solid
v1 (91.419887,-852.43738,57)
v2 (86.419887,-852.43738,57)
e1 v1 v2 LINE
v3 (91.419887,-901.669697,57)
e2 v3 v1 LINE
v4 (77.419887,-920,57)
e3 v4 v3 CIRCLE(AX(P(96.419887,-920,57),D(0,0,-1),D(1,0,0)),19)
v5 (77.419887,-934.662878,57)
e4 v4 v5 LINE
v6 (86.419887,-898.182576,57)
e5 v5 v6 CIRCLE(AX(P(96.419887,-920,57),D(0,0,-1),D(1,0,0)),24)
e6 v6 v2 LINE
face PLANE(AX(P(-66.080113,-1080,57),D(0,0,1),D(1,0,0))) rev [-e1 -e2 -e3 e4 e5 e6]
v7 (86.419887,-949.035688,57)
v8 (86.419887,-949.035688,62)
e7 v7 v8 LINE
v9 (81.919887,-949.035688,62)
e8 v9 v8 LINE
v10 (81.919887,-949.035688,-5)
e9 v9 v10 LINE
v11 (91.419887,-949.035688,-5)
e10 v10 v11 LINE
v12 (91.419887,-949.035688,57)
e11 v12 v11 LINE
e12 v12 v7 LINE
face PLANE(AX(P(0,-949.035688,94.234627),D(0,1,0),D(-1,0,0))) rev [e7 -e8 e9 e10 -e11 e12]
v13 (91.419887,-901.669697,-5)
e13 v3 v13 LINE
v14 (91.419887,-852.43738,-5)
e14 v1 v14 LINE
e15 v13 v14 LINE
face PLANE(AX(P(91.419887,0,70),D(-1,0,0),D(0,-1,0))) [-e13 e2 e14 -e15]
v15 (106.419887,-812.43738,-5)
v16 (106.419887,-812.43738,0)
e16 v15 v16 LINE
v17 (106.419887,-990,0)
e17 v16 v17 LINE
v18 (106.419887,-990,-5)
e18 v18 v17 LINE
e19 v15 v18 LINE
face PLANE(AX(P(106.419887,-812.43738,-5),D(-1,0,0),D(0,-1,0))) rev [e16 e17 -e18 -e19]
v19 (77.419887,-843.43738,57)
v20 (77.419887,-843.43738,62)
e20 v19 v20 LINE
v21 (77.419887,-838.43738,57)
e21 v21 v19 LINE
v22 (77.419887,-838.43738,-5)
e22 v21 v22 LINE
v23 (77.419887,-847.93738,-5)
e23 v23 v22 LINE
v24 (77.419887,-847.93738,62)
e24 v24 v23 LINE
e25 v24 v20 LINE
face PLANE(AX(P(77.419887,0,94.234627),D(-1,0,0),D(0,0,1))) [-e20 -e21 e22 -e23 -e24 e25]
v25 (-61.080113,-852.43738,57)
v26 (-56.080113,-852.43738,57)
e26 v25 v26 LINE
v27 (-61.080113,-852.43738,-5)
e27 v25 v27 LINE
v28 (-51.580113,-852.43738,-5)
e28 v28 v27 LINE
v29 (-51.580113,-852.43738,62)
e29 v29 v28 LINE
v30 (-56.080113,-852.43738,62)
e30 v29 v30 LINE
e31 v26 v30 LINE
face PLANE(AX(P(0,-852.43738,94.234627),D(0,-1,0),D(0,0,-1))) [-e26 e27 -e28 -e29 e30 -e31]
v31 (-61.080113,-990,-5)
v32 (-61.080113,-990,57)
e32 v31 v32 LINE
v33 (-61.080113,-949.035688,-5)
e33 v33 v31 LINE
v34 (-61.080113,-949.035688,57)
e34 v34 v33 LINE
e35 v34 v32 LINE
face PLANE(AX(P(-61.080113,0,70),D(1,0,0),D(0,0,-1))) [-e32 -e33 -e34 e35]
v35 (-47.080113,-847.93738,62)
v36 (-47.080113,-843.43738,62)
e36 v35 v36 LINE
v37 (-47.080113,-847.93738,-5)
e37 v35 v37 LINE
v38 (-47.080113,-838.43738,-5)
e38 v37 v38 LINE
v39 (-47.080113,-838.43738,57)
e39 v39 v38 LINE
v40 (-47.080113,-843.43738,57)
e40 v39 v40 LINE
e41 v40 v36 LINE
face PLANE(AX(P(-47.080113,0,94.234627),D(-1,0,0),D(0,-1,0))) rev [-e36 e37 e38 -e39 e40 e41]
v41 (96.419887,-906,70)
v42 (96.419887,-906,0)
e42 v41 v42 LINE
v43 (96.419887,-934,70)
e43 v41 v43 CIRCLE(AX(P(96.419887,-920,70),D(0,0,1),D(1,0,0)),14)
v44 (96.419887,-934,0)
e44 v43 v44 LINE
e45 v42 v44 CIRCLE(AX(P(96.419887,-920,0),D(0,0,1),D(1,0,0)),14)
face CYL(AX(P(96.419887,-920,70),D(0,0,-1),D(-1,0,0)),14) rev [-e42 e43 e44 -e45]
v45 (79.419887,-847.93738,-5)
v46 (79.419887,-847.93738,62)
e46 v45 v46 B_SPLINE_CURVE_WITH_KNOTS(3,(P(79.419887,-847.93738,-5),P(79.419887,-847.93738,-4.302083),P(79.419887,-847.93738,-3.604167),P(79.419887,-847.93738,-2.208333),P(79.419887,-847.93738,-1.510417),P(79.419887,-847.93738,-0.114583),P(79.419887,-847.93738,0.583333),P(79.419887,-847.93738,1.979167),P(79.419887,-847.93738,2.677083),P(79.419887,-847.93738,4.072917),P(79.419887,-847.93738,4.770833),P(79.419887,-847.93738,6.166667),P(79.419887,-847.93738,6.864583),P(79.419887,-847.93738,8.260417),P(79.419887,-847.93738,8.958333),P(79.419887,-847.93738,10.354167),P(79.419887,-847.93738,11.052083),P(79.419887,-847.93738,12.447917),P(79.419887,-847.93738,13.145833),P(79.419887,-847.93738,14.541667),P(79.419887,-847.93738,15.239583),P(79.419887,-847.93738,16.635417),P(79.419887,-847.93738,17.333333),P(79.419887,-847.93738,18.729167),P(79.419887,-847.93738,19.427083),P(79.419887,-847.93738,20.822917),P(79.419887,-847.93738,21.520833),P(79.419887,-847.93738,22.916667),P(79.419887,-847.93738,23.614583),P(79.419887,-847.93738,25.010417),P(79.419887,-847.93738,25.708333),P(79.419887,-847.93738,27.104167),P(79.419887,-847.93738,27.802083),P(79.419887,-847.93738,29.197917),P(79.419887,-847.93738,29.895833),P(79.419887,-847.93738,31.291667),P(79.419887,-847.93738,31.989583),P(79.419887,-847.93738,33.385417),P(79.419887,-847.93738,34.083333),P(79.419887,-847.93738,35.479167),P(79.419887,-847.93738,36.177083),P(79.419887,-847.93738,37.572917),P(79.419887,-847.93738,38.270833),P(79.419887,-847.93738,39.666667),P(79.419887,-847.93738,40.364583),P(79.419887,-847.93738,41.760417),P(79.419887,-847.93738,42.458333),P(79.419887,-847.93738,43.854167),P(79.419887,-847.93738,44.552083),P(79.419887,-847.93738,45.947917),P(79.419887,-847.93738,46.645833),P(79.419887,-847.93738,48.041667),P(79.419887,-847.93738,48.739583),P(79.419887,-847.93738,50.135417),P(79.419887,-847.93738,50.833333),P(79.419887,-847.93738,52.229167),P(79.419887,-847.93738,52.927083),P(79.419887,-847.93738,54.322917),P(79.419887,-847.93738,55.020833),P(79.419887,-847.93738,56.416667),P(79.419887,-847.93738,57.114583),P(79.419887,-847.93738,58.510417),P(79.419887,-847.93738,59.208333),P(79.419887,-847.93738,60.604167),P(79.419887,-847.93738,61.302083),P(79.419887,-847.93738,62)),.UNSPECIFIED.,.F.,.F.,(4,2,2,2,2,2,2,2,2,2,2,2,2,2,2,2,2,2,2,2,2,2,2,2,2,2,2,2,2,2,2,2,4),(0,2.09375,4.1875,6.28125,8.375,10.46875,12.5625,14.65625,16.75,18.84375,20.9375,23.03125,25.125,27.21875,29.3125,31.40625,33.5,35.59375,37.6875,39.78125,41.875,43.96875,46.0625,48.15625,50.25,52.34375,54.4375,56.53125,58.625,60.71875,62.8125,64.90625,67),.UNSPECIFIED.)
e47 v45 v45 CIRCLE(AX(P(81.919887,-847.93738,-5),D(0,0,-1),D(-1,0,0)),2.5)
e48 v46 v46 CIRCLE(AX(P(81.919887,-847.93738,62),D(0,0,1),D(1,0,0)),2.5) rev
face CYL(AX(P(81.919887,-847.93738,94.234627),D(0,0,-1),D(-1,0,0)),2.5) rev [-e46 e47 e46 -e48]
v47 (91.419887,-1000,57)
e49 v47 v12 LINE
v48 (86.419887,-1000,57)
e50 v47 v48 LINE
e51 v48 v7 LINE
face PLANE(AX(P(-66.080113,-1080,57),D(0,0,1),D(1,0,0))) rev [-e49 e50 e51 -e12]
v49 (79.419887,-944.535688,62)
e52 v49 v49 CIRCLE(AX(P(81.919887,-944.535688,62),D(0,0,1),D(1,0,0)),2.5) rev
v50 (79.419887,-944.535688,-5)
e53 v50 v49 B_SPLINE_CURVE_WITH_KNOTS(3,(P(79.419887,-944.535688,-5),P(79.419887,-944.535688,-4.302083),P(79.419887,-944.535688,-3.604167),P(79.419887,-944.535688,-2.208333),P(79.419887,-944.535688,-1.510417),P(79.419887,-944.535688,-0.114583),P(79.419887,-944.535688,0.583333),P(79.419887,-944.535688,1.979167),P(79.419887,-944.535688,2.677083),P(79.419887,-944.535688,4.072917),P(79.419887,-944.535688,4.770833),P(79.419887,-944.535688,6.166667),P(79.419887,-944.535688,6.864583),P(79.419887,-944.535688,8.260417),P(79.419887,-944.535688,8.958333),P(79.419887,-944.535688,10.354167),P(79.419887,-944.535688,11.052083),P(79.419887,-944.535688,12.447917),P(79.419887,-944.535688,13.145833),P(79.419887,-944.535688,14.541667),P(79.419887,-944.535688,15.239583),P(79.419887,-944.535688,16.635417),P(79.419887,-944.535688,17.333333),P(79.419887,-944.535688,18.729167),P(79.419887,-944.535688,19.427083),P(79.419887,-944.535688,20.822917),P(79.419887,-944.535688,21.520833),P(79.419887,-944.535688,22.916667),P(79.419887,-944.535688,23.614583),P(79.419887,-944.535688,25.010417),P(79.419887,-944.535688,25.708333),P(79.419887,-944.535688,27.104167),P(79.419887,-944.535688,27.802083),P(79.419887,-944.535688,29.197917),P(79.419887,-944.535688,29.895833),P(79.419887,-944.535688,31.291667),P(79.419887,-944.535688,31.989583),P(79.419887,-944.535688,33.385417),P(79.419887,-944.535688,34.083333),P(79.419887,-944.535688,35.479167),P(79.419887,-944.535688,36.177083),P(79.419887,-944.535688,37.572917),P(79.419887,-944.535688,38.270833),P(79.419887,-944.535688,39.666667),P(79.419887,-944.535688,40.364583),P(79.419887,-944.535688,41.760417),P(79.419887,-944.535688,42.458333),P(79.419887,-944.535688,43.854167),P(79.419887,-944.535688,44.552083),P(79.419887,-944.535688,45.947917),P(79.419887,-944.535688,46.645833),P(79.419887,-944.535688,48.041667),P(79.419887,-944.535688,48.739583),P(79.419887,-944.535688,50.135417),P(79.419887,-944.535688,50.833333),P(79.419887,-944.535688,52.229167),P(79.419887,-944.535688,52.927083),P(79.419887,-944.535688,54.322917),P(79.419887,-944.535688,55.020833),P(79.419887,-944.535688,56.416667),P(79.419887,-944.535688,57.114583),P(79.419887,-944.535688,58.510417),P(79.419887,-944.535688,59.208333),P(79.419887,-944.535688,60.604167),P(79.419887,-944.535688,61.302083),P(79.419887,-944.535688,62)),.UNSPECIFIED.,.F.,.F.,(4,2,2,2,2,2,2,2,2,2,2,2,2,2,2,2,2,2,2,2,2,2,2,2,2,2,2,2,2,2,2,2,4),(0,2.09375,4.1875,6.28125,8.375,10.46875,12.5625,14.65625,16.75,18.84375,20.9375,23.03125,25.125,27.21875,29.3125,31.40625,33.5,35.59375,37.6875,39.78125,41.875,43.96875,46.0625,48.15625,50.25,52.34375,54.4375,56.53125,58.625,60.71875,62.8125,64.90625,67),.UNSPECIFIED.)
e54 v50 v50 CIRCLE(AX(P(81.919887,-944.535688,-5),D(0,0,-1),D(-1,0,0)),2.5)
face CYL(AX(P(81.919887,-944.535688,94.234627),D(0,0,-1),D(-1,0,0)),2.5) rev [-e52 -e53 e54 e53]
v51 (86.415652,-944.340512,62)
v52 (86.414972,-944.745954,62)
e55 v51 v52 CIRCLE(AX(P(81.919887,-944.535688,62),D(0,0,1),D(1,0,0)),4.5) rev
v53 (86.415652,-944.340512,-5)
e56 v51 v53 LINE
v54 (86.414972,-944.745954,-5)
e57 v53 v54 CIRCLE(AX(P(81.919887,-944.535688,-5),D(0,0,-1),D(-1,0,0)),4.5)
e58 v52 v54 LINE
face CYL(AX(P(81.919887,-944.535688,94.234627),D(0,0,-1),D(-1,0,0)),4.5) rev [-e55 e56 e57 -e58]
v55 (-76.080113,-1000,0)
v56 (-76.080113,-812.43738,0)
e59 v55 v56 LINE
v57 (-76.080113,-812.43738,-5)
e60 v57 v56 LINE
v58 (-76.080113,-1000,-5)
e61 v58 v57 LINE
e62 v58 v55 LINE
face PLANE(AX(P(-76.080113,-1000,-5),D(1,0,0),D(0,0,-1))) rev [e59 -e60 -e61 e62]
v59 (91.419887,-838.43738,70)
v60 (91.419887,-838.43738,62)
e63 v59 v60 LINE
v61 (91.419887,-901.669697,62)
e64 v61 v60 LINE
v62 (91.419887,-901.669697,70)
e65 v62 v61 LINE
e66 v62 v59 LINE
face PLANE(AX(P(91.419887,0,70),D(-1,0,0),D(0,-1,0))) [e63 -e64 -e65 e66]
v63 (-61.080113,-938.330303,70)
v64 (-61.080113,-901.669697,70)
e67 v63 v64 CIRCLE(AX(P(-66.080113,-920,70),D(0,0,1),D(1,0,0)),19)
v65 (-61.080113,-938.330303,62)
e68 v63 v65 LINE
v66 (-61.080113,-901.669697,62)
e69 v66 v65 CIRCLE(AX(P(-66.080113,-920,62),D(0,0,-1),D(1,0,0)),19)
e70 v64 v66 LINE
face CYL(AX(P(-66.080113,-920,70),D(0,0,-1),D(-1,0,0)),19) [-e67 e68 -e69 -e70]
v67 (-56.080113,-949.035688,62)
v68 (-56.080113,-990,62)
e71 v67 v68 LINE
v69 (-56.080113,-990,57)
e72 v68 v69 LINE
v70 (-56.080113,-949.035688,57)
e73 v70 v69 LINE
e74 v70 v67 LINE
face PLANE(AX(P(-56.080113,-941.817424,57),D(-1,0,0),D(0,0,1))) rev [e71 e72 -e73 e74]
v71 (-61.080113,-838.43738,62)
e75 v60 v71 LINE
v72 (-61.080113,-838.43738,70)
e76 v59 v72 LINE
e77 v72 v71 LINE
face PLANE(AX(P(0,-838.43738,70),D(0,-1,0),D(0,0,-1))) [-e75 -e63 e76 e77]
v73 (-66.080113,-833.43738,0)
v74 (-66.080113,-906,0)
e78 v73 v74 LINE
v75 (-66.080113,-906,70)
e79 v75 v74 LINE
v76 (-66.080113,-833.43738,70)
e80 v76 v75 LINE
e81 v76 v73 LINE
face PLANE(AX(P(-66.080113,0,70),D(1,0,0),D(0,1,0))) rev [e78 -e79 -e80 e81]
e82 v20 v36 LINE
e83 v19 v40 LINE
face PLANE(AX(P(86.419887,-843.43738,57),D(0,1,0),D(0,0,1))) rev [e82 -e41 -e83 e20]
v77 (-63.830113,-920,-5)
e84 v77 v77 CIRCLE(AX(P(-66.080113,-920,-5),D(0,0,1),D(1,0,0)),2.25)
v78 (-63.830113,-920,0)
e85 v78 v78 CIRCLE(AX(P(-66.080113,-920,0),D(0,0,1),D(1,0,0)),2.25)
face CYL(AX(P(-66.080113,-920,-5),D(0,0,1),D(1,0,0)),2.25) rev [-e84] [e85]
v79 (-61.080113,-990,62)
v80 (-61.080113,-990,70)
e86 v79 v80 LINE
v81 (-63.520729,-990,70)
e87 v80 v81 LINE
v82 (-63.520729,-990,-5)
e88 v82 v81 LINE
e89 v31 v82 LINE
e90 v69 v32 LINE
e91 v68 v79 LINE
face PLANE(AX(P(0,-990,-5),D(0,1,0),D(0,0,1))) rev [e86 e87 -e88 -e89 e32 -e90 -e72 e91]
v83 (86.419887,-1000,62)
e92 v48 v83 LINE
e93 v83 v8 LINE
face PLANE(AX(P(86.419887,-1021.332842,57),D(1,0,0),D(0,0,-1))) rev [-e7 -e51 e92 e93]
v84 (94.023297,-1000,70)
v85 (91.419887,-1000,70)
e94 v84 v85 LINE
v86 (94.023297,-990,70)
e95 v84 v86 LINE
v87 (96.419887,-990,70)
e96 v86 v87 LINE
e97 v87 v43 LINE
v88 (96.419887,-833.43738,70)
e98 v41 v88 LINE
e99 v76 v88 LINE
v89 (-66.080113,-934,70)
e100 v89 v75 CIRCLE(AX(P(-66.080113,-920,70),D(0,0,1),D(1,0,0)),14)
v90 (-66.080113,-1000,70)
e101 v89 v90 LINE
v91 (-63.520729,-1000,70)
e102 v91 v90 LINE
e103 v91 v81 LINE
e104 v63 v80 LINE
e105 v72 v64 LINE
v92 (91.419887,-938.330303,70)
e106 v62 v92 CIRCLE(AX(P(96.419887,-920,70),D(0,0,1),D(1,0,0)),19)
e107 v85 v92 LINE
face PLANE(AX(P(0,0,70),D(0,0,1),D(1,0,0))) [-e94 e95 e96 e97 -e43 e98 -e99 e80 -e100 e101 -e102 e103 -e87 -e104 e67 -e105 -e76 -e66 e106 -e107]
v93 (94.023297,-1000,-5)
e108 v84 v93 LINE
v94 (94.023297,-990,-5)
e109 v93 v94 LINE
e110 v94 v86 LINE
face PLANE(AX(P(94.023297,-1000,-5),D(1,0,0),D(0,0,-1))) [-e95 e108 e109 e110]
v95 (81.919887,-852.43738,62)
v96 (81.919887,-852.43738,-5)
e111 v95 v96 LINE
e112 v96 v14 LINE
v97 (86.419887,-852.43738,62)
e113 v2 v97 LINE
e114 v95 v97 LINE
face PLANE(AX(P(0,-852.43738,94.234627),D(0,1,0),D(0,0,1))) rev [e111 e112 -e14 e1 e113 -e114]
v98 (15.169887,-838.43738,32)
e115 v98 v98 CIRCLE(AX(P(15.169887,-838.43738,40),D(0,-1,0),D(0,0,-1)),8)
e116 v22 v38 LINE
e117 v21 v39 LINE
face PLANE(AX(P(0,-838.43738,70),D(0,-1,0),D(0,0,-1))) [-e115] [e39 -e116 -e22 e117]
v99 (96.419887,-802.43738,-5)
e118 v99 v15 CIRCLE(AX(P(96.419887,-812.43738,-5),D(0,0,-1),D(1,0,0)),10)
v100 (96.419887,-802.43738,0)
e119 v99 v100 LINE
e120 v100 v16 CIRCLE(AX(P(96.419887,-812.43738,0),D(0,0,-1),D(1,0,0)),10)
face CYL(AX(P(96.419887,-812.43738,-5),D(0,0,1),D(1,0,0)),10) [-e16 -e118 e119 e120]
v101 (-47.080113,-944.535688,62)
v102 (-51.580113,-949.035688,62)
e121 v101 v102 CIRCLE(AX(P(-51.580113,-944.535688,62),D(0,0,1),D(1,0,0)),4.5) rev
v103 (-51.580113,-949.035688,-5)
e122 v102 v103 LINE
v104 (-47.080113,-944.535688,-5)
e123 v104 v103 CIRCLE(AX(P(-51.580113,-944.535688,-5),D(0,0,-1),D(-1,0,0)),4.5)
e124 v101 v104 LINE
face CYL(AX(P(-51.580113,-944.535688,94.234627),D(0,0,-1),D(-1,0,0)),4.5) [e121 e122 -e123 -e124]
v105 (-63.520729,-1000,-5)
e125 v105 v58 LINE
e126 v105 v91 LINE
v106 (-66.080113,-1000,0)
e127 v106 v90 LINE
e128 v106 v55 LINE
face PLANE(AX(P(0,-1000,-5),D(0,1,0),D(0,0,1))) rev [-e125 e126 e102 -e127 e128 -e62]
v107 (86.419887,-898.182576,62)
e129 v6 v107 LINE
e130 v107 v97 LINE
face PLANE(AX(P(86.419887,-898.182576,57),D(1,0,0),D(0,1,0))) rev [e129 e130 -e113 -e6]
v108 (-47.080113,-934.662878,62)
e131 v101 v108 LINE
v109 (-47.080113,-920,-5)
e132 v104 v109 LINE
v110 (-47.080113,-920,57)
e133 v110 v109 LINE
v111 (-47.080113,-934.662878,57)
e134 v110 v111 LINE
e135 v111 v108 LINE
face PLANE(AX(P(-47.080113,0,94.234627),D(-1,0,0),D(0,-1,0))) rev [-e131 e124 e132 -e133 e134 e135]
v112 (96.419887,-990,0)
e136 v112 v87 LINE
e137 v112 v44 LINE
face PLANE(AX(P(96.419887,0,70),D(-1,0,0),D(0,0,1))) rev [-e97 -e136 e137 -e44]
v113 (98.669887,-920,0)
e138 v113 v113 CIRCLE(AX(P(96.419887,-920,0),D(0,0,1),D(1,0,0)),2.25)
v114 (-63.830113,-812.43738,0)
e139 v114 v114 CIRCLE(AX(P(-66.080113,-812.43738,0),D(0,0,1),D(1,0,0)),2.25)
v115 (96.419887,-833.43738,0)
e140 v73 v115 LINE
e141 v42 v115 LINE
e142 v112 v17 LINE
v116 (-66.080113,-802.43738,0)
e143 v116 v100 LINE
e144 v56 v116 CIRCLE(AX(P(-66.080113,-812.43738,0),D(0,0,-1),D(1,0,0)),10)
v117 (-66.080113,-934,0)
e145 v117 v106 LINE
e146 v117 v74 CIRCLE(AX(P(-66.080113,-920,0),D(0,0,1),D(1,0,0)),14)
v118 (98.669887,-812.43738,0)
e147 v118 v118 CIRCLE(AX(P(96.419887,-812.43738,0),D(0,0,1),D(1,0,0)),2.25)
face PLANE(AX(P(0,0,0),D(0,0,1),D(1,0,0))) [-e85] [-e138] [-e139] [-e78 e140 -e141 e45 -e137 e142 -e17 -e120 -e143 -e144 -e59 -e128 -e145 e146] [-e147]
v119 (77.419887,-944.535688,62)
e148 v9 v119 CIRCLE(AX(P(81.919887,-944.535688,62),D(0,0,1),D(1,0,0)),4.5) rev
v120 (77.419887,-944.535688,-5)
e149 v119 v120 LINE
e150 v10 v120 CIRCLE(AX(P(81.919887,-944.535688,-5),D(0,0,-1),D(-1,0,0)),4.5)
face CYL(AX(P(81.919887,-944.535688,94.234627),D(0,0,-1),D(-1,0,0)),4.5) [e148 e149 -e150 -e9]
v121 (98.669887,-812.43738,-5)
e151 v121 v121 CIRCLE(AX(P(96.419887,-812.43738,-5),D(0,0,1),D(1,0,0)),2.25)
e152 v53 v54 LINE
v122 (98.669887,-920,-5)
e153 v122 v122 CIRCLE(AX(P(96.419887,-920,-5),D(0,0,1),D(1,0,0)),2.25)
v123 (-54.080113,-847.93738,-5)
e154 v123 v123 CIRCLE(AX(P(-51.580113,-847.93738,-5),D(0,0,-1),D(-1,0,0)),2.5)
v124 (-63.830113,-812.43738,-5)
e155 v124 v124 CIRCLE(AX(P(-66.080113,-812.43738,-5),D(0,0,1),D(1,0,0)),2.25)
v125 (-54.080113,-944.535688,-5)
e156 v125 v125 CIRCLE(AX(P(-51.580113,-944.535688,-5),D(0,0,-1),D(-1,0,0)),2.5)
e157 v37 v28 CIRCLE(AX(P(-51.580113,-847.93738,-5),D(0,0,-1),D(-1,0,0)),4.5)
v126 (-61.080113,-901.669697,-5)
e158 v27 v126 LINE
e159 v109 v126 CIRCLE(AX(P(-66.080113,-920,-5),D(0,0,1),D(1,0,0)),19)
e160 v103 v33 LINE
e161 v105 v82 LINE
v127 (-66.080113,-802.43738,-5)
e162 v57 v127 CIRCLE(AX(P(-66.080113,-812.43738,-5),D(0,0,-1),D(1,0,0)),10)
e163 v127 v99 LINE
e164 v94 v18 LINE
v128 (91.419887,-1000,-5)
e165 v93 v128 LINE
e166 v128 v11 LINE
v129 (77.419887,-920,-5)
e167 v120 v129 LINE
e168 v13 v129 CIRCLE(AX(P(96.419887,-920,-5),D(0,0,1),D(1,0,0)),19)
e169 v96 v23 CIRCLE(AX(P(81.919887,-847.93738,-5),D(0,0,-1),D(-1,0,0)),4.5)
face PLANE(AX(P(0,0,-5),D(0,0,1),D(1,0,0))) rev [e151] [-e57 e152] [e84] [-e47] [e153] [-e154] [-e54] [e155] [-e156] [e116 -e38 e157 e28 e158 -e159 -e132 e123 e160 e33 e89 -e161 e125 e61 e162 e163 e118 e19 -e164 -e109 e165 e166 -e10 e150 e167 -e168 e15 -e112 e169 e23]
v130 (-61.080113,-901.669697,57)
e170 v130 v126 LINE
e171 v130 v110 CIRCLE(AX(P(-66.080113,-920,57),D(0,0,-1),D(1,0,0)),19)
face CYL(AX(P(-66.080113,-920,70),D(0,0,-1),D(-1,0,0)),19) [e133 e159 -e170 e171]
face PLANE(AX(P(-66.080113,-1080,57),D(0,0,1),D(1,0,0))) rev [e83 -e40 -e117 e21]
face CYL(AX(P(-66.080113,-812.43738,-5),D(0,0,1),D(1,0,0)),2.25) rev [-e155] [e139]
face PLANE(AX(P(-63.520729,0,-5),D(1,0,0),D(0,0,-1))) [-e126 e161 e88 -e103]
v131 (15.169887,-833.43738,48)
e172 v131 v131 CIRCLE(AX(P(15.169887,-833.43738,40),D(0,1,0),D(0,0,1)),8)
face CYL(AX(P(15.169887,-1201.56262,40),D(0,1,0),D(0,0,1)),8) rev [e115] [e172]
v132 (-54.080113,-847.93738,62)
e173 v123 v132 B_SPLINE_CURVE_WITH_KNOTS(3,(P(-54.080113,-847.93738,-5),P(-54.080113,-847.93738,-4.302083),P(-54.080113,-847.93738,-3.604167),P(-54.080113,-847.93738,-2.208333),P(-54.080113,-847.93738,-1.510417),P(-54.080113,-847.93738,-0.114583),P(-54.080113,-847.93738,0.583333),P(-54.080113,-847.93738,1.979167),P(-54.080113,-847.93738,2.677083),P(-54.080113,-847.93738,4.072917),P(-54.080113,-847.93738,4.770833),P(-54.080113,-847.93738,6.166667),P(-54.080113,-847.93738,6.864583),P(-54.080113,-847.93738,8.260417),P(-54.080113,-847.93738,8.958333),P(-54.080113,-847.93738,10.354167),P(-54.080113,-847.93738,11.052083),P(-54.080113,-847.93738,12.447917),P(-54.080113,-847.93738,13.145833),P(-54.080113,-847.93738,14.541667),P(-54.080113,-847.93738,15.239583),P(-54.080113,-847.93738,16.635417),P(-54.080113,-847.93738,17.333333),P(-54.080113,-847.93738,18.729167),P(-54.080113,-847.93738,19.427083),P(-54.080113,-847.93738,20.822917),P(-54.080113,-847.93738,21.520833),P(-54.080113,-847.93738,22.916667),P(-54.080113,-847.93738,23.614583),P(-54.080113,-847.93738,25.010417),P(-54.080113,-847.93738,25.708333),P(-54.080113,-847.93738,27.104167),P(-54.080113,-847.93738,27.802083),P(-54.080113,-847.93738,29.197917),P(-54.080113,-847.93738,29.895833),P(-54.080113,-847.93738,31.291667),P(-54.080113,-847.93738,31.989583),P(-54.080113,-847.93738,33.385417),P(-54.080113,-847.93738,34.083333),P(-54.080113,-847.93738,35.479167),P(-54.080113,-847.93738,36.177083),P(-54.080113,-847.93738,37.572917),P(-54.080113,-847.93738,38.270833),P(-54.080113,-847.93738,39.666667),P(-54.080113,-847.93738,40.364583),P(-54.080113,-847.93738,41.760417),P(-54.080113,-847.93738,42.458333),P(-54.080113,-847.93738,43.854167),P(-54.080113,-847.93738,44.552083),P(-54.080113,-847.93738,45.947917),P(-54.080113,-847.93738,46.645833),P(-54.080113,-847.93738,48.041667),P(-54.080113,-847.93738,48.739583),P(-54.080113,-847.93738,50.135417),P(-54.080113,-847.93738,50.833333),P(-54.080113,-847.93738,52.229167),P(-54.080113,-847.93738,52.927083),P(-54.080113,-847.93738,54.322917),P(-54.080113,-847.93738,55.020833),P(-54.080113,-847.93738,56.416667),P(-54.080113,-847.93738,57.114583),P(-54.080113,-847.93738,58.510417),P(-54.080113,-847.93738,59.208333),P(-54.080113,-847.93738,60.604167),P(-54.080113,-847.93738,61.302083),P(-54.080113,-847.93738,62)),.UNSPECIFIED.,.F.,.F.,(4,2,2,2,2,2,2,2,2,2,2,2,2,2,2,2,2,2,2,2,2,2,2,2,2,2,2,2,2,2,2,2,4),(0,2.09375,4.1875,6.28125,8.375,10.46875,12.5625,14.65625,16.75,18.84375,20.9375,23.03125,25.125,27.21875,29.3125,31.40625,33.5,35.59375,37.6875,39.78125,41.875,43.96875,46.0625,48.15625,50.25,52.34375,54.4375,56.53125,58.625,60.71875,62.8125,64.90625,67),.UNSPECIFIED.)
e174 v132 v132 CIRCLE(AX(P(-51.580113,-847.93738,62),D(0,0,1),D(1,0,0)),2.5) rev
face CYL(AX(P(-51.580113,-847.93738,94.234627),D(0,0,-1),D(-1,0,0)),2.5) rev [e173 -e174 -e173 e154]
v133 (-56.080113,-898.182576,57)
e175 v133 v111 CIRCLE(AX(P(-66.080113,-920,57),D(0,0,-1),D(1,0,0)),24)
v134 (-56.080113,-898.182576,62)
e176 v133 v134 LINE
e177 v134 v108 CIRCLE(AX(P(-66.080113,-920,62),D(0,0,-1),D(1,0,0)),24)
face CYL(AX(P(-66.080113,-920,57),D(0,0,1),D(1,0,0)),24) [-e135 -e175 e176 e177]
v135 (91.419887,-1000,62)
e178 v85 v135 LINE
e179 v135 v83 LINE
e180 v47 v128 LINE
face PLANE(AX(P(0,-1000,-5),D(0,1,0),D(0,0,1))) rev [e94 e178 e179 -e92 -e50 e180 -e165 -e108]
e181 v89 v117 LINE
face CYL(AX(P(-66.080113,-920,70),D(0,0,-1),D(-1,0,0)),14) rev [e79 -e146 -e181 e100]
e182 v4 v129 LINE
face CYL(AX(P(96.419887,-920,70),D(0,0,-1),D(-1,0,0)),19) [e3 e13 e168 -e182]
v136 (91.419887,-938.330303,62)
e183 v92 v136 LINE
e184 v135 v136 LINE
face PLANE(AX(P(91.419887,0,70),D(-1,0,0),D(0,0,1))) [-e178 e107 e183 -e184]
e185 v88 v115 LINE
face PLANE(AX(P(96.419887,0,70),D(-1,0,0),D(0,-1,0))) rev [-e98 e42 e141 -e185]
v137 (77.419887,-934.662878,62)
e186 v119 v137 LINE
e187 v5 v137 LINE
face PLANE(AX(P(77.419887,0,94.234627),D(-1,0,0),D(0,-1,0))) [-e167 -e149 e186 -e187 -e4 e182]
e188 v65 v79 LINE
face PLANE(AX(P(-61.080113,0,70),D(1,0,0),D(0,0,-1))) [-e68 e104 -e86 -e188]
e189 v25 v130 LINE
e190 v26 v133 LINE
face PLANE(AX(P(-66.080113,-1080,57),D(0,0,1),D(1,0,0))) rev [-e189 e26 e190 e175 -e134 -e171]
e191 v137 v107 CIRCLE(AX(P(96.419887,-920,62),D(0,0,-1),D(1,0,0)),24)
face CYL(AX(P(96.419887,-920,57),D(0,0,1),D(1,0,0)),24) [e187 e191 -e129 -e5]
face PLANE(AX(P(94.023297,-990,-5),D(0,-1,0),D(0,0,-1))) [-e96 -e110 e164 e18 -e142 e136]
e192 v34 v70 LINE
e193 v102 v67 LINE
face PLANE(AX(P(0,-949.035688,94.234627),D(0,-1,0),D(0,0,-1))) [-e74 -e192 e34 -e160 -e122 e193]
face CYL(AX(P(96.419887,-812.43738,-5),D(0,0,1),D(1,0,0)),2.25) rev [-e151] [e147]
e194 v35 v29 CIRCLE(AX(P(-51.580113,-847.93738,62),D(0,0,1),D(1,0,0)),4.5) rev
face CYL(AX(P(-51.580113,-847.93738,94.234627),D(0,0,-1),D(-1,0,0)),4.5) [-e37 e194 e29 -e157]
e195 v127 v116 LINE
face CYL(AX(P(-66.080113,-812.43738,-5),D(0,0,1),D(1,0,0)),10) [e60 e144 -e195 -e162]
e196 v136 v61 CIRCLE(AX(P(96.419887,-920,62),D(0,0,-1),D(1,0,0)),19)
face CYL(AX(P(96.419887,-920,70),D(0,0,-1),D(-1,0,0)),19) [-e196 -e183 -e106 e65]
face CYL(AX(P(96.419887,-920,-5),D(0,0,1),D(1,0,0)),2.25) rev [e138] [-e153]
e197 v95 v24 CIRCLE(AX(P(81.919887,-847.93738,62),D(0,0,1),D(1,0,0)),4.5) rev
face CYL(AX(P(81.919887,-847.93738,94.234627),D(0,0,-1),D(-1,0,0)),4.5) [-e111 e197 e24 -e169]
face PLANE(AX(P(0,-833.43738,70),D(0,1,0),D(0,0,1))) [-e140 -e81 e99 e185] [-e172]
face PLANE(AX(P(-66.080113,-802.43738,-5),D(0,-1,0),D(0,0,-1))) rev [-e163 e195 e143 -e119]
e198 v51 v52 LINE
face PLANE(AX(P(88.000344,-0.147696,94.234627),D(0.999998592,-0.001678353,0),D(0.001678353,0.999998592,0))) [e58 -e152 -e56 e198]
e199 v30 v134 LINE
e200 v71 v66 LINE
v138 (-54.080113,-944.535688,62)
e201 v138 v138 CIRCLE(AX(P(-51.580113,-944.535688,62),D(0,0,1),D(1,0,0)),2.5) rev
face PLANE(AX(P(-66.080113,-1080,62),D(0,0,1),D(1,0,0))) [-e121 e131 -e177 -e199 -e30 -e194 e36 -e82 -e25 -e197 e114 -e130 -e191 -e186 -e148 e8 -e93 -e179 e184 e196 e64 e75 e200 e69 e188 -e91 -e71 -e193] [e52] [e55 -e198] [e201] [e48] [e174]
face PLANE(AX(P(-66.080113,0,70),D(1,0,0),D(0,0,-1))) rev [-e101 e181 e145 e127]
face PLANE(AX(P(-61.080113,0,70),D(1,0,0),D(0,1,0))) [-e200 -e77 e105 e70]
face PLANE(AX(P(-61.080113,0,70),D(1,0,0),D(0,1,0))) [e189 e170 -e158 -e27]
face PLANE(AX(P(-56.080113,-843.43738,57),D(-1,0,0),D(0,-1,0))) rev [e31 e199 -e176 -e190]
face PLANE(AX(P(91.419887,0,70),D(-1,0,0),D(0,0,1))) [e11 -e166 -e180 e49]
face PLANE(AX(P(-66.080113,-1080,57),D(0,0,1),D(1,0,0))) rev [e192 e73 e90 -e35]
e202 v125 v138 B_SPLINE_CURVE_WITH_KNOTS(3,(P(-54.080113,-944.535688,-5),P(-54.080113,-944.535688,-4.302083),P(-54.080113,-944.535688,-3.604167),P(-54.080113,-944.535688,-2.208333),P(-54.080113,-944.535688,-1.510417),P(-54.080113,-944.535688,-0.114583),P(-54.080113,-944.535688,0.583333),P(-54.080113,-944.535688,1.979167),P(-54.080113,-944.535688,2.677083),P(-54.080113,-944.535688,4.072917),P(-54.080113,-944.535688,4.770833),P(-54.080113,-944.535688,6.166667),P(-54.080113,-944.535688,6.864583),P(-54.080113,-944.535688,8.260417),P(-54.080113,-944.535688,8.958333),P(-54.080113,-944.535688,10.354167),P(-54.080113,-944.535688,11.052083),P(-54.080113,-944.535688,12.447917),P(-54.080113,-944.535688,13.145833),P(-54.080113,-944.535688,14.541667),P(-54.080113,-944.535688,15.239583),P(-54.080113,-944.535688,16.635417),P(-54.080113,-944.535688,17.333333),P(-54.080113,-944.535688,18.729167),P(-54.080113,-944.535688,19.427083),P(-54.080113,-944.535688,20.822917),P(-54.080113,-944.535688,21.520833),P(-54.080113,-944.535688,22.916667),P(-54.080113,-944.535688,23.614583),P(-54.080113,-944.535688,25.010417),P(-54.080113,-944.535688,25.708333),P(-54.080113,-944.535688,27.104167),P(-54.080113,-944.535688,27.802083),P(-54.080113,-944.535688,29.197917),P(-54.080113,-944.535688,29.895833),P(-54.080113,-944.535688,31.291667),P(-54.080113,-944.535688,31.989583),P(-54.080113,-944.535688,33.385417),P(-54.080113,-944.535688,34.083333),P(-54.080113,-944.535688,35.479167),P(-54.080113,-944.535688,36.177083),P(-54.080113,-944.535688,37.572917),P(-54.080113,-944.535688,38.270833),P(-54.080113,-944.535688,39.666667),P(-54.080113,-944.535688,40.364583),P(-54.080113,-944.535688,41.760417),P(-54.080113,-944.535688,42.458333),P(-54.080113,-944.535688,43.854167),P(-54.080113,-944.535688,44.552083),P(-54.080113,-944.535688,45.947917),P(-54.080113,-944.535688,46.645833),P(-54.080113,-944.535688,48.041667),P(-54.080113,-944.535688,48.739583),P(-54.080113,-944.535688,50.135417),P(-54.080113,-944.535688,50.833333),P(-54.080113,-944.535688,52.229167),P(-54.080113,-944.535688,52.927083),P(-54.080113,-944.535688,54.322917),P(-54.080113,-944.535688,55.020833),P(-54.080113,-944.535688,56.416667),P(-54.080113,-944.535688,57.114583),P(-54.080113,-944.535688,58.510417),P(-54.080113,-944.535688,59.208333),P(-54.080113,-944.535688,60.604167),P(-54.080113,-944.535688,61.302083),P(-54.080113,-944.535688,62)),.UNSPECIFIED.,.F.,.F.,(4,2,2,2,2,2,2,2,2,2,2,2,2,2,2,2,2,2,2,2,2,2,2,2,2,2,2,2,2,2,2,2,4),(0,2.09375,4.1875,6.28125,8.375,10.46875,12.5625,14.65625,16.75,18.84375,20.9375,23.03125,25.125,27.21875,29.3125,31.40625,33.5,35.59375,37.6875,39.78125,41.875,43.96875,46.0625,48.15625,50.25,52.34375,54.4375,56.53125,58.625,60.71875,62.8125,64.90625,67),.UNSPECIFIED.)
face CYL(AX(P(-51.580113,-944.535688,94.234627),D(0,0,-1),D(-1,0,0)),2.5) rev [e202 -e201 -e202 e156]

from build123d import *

# Parameters (mm, degrees)
SKETCH1_R               = 2.25
SKETCH1_R_2             = 7.9375
BOSS_EXTRUDE1_DEPTH     = 5
BOSS_EXTRUDE2_DEPTH     = 70
SKETCH3_R               = 8
CUT_EXTRUDE1_DEPTH      = 391.651691136
CUT_EXTRUDE2_DEPTH      = 1209.654326614
SKETCH5_R               = 7.9375
CUT_EXTRUDE3_DEPTH      = 1209.654326614
BOSS_EXTRUDE4_DEPTH     = 5
BOSS_EXTRUDE5_START     = -67
BOSS_EXTRUDE5_OUTLINE_R = 2.5
BOSS_EXTRUDE5_DEPTH     = 67
CUT_EXTRUDE4_DEPTH      = 1209.654326614
CUT_EXTRUDE4_DEPTH_BACK = 1209.654326614
CUT_EXTRUDE5_DEPTH      = 1009.510065127


# Read off the part's stored shape, not the designer's step: Boss-Extrude5
with BuildPart() as part:
    # Sketch1 → Boss-Extrude1 (new body)
    with BuildSketch(Plane.XY):
        with BuildLine():
            Line((-66.080112923, -1201.56262), (96.419887077, -1201.56262))
            ThreePointArc((96.419887077, -1201.56262), (106.319382013, -1197.462114937), (110.419887077, -1187.56262))
            Line((110.419887077, -1187.56262), (110.419887077, -812.43738))
            ThreePointArc((110.419887077, -812.43738), (106.319382013, -802.537885063), (96.419887077, -798.43738))
            Line((96.419887077, -798.43738), (-66.080112923, -798.43738))
            ThreePointArc((-66.080112923, -798.43738), (-75.97960786, -802.537885063), (-80.080112923, -812.43738))
            Line((-80.080112923, -812.43738), (-80.080112923, -1187.56262))
            ThreePointArc((-80.080112923, -1187.56262), (-75.97960786, -1197.462114937), (-66.080112923, -1201.56262))
        make_face()
        with Locations((96.419887077, -1080)):
            Circle(SKETCH1_R, mode=Mode.SUBTRACT)
        with Locations((88.147808187, -1029.0799835)):
            Circle(SKETCH1_R_2, mode=Mode.SUBTRACT)
        with Locations((-66.080112923, -1080)):
            Circle(SKETCH1_R, mode=Mode.SUBTRACT)
        with Locations((96.419887077, -920)):
            Circle(SKETCH1_R, mode=Mode.SUBTRACT)
        with Locations((-66.080112923, -920)):
            Circle(SKETCH1_R, mode=Mode.SUBTRACT)
        with Locations((-66.080112923, -1187.56262)):
            Circle(SKETCH1_R, mode=Mode.SUBTRACT)
        with Locations((96.419887077, -1187.56262)):
            Circle(SKETCH1_R, mode=Mode.SUBTRACT)
        with Locations((-66.080112923, -812.43738)):
            Circle(SKETCH1_R, mode=Mode.SUBTRACT)
        with Locations((96.419887077, -812.43738)):
            Circle(SKETCH1_R, mode=Mode.SUBTRACT)
    extrude(amount=-BOSS_EXTRUDE1_DEPTH)

    # Sketch2 → Boss-Extrude2 (add)
    with BuildSketch(Plane.XY):
        with BuildLine():
            Line((91.419887077, -1166.56262), (96.419887077, -1166.56262))
            Line((96.419887077, -1166.56262), (96.419887077, -1099))
            Line((96.419887077, -1099), (96.419887077, -1094))
            ThreePointArc((96.419887077, -1094), (82.419887077, -1080), (96.419887077, -1066))
            Line((96.419887077, -1066), (96.419887077, -1061))
            Line((96.419887077, -1061), (96.419887077, -1044.996221029))
            ThreePointArc((96.419887077, -1044.996221029), (106.085308187, -1029.0799835), (96.419887077, -1013.163745971))
            Line((96.419887077, -1013.163745971), (96.419887077, -939))
            Line((96.419887077, -939), (96.419887077, -934))
            ThreePointArc((96.419887077, -934), (82.419887077, -920), (96.419887077, -906))
            Line((96.419887077, -906), (96.419887077, -901))
            Line((96.419887077, -901), (96.419887077, -833.43738))
            Line((96.419887077, -833.43738), (91.419887077, -833.43738))
            Line((91.419887077, -833.43738), (-61.080112923, -833.43738))
            Line((-61.080112923, -833.43738), (-66.080112923, -833.43738))
            Line((-66.080112923, -833.43738), (-66.080112923, -901))
            Line((-66.080112923, -901), (-66.080112923, -906))
            ThreePointArc((-66.080112923, -906), (-56.180617987, -910.100505063), (-52.080112923, -920))
            ThreePointArc((-52.080112923, -920), (-56.180617987, -929.899494937), (-66.080112923, -934))
            Line((-66.080112923, -934), (-66.080112923, -939))
            Line((-66.080112923, -939), (-66.080112923, -1061))
            Line((-66.080112923, -1061), (-66.080112923, -1066))
            ThreePointArc((-66.080112923, -1066), (-56.180617987, -1070.100505063), (-52.080112923, -1080))
            ThreePointArc((-52.080112923, -1080), (-56.180617987, -1089.899494937), (-66.080112923, -1094))
            Line((-66.080112923, -1094), (-66.080112923, -1099))
            Line((-66.080112923, -1099), (-66.080112923, -1166.56262))
            Line((-66.080112923, -1166.56262), (-61.080112923, -1166.56262))
            Line((-61.080112923, -1166.56262), (91.419887077, -1166.56262))
        make_face()
        with BuildLine():
            Line((91.419887077, -1098.33030278), (91.419887077, -1161.56262))
            Line((91.419887077, -1161.56262), (-61.080112923, -1161.56262))
            Line((-61.080112923, -1161.56262), (-61.080112923, -1098.33030278))
            ThreePointArc((-61.080112923, -1098.33030278), (-47.080112923, -1080), (-61.080112923, -1061.66969722))
            Line((-61.080112923, -1061.66969722), (-61.080112923, -938.33030278))
            ThreePointArc((-61.080112923, -938.33030278), (-47.080112923, -920), (-61.080112923, -901.66969722))
            Line((-61.080112923, -901.66969722), (-61.080112923, -838.43738))
            Line((-61.080112923, -838.43738), (91.419887077, -838.43738))
            Line((91.419887077, -838.43738), (91.419887077, -901.66969722))
            ThreePointArc((91.419887077, -901.66969722), (77.419887077, -920), (91.419887077, -938.33030278))
            Line((91.419887077, -938.33030278), (91.419887077, -1011.443447389))
            Line((91.419887077, -1011.443447389), (91.419887077, -1016.563098664))
            ThreePointArc((91.419887077, -1016.563098664), (94.061132369, -1017.572963757), (96.419887077, -1019.132540759))
            ThreePointArc((96.419887077, -1019.132540759), (99.861025654, -1023.586401535), (101.085308187, -1029.0799835))
            ThreePointArc((101.085308187, -1029.0799835), (99.861025654, -1034.573565465), (96.419887077, -1039.027426241))
            ThreePointArc((96.419887077, -1039.027426241), (94.061132369, -1040.587003243), (91.419887077, -1041.596868336))
            Line((91.419887077, -1041.596868336), (91.419887077, -1046.716519611))
            Line((91.419887077, -1046.716519611), (91.419887077, -1061.66969722))
            ThreePointArc((91.419887077, -1061.66969722), (77.419887077, -1080), (91.419887077, -1098.33030278))
        make_face(mode=Mode.SUBTRACT)
    extrude(amount=BOSS_EXTRUDE2_DEPTH)

    # Sketch3 → Cut-Extrude1 (cut, through all)
    with BuildSketch(Plane(origin=(0, -833.43738, 0), x_dir=(1, 0, 0), z_dir=(0, 1, 0))):
        with Locations(Location((15.169887077, -40, 0), (0, 0, 270))):
            Circle(SKETCH3_R)
    extrude(amount=-CUT_EXTRUDE1_DEPTH, mode=Mode.SUBTRACT)

    # Sketch4 → Cut-Extrude2 (cut, through all)
    with BuildSketch(Plane.XY):
        with BuildLine():
            Line((-61.080112923, -1161.56262), (91.419887077, -1161.56262))
            Line((91.419887077, -1161.56262), (91.419887077, -1098.33030278))
            ThreePointArc((91.419887077, -1098.33030278), (77.419887077, -1080), (91.419887077, -1061.66969722))
            Line((91.419887077, -1061.66969722), (91.419887077, -1046.716519611))
            ThreePointArc((91.419887077, -1046.716519611), (70.210308187, -1029.0799835), (91.419887077, -1011.443447389))
            Line((91.419887077, -1011.443447389), (91.419887077, -938.33030278))
            ThreePointArc((91.419887077, -938.33030278), (77.419887077, -920), (91.419887077, -901.66969722))
            Line((91.419887077, -901.66969722), (91.419887077, -838.43738))
            Line((91.419887077, -838.43738), (-61.080112923, -838.43738))
            Line((-61.080112923, -838.43738), (-61.080112923, -901.66969722))
            ThreePointArc((-61.080112923, -901.66969722), (-47.080112923, -920), (-61.080112923, -938.33030278))
            Line((-61.080112923, -938.33030278), (-61.080112923, -1061.66969722))
            ThreePointArc((-61.080112923, -1061.66969722), (-47.080112923, -1080), (-61.080112923, -1098.33030278))
            Line((-61.080112923, -1098.33030278), (-61.080112923, -1161.56262))
        make_face()
    extrude(amount=-CUT_EXTRUDE2_DEPTH, mode=Mode.SUBTRACT)

    # Sketch5 → Cut-Extrude3 (cut, through all)
    # profile 1 of 2: a face of its own
    with BuildSketch(Plane.XY):
        with BuildLine():
            ThreePointArc((101.085308187, -1029.0799835), (98.387716069, -1021.172822644), (91.419887077, -1016.563098664))
            ThreePointArc((91.419887077, -1016.563098664), (75.210308187, -1029.0799835), (91.419887077, -1041.596868336))
            ThreePointArc((91.419887077, -1041.596868336), (98.387716069, -1036.987144356), (101.085308187, -1029.0799835))
        make_face()
        with Locations((88.147808187, -1029.0799835)):
            Circle(SKETCH5_R, mode=Mode.SUBTRACT)
    # profile 2 of 2: a face of its own
    with BuildSketch(Plane.XY):
        with BuildLine():
            Line((91.419887077, -1016.563098664), (91.419887077, -1011.443447389))
            ThreePointArc((91.419887077, -1011.443447389), (70.210308187, -1029.0799835), (91.419887077, -1046.716519611))
            Line((91.419887077, -1046.716519611), (91.419887077, -1041.596868336))
            ThreePointArc((91.419887077, -1041.596868336), (75.210308187, -1029.0799835), (91.419887077, -1016.563098664))
        make_face()
    extrude(amount=-CUT_EXTRUDE3_DEPTH, mode=Mode.SUBTRACT)

    # Sketch9 → Boss-Extrude4 (add)
    with BuildSketch(Plane.XY.offset(62)):
        with BuildLine():
            Line((-61.080112923, -1098.33030278), (-61.080112923, -1161.56262))
            Line((-61.080112923, -1161.56262), (91.419887077, -1161.56262))
            Line((91.419887077, -1161.56262), (91.419887077, -1098.33030278))
            ThreePointArc((91.419887077, -1098.33030278), (77.419887077, -1080), (91.419887077, -1061.66969722))
            Line((91.419887077, -1061.66969722), (91.419887077, -1041.596868336))
            ThreePointArc((91.419887077, -1041.596868336), (101.085308187, -1029.0799835), (91.419887077, -1016.563098664))
            Line((91.419887077, -1016.563098664), (91.419887077, -938.33030278))
            ThreePointArc((91.419887077, -938.33030278), (77.419887077, -920), (91.419887077, -901.66969722))
            Line((91.419887077, -901.66969722), (91.419887077, -838.43738))
            Line((91.419887077, -838.43738), (-61.080112923, -838.43738))
            Line((-61.080112923, -838.43738), (-61.080112923, -901.66969722))
            ThreePointArc((-61.080112923, -901.66969722), (-47.080112923, -920), (-61.080112923, -938.33030278))
            Line((-61.080112923, -938.33030278), (-61.080112923, -1061.66969722))
            ThreePointArc((-61.080112923, -1061.66969722), (-47.080112923, -1080), (-61.080112923, -1098.33030278))
        make_face()
        with BuildLine():
            Line((86.419887077, -843.43738), (-56.080112923, -843.43738))
            Line((-56.080112923, -843.43738), (-56.080112923, -898.182575771))
            ThreePointArc((-56.080112923, -898.182575771), (-42.080112923, -920), (-56.080112923, -941.817424229))
            Line((-56.080112923, -941.817424229), (-56.080112923, -1058.182575771))
            ThreePointArc((-56.080112923, -1058.182575771), (-42.080112923, -1080), (-56.080112923, -1101.817424229))
            Line((-56.080112923, -1101.817424229), (-56.080112923, -1156.56262))
            Line((-56.080112923, -1156.56262), (86.419887077, -1156.56262))
            Line((86.419887077, -1156.56262), (86.419887077, -1101.817424229))
            ThreePointArc((86.419887077, -1101.817424229), (72.419887077, -1080), (86.419887077, -1058.182575771))
            Line((86.419887077, -1058.182575771), (86.419887077, -1036.827124578))
            ThreePointArc((86.419887077, -1036.827124578), (96.085308187, -1029.0799835), (86.419887077, -1021.332842422))
            Line((86.419887077, -1021.332842422), (86.419887077, -941.817424229))
            ThreePointArc((86.419887077, -941.817424229), (72.419887077, -920), (86.419887077, -898.182575771))
            Line((86.419887077, -898.182575771), (86.419887077, -843.43738))
        make_face(mode=Mode.SUBTRACT)
    extrude(amount=-BOSS_EXTRUDE4_DEPTH)

    # Boss-Extrude5 outline → Boss-Extrude5 (add)
    # profile 1 of 8: a face of its own
    with BuildSketch(Plane(origin=(0, 0, -5), x_dir=(-1, 0, 0), z_dir=(0, 0, -1)).offset(BOSS_EXTRUDE5_START)):
        with BuildLine():
            ThreePointArc((-77.419887077, -1152.06262), (-78.737906562, -1148.880639485), (-81.919887077, -1147.56262))
            Line((-81.919887077, -1147.56262), (-91.419887077, -1147.56262))
            Line((-91.419887077, -1147.56262), (-91.419887077, -1161.56262))
            Line((-91.419887077, -1161.56262), (-77.419887077, -1161.56262))
            Line((-77.419887077, -1161.56262), (-77.419887077, -1152.06262))
        make_face()
        with Locations((-81.919887077, -1152.06262)):
            Circle(BOSS_EXTRUDE5_OUTLINE_R, mode=Mode.SUBTRACT)
    # profile 2 of 8: a face of its own
    with BuildSketch(Plane(origin=(0, 0, -5), x_dir=(-1, 0, 0), z_dir=(0, 0, -1)).offset(BOSS_EXTRUDE5_START)):
        with BuildLine():
            Line((-81.919887077, -1050.964311707), (-91.419887077, -1050.964311707))
            Line((-91.419887077, -1050.964311707), (-91.419887077, -1061.66969722))
            ThreePointArc((-91.419887077, -1061.66969722), (-81.320218206, -1068.467437405), (-77.419887077, -1080))
            Line((-77.419887077, -1080), (-77.419887077, -1055.464311707))
            ThreePointArc((-77.419887077, -1055.464311707), (-78.737906561, -1052.282331191), (-81.919887077, -1050.964311707))
        make_face()
        with Locations((-81.919887077, -1055.464311707)):
            Circle(BOSS_EXTRUDE5_OUTLINE_R, mode=Mode.SUBTRACT)
    # profile 3 of 8: a face of its own
    with BuildSketch(Plane(origin=(0, 0, -5), x_dir=(-1, 0, 0), z_dir=(0, 0, -1)).offset(BOSS_EXTRUDE5_START)):
        with BuildLine():
            Line((61.080112923, -1147.56262), (51.580112923, -1147.56262))
            ThreePointArc((51.580112923, -1147.56262), (48.398132408, -1148.880639485), (47.080112923, -1152.06262))
            Line((47.080112923, -1152.06262), (47.080112923, -1161.56262))
            Line((47.080112923, -1161.56262), (61.080112923, -1161.56262))
            Line((61.080112923, -1161.56262), (61.080112923, -1147.56262))
        make_face()
        with Locations((51.580112923, -1152.06262)):
            Circle(BOSS_EXTRUDE5_OUTLINE_R, mode=Mode.SUBTRACT)
    # profile 4 of 8: a face of its own
    with BuildSketch(Plane(origin=(0, 0, -5), x_dir=(-1, 0, 0), z_dir=(0, 0, -1)).offset(BOSS_EXTRUDE5_START)):
        with BuildLine():
            Line((61.080112923, -1050.964311707), (51.580112923, -1050.964311707))
            ThreePointArc((51.580112923, -1050.964311707), (48.398132408, -1052.282331192), (47.080112923, -1055.464311707))
            Line((47.080112923, -1055.464311707), (47.101209294, -1079.104892724))
            ThreePointArc((47.101209294, -1079.104892724), (51.256366252, -1068.114860765), (61.080112923, -1061.66969722))
            Line((61.080112923, -1061.66969722), (61.080112923, -1050.964311707))
        make_face()
        with Locations((51.580112923, -1055.464311707)):
            Circle(BOSS_EXTRUDE5_OUTLINE_R, mode=Mode.SUBTRACT)
    # profile 5 of 8: a face of its own
    with BuildSketch(Plane(origin=(0, 0, -5), x_dir=(-1, 0, 0), z_dir=(0, 0, -1)).offset(BOSS_EXTRUDE5_START)):
        with BuildLine():
            Line((47.080112923, -920), (47.080112923, -944.535688293))
            ThreePointArc((47.080112923, -944.535688293), (48.398132408, -947.717668808), (51.580112923, -949.035688293))
            Line((51.580112923, -949.035688293), (61.080112923, -949.035688293))
            Line((61.080112923, -949.035688293), (61.080112923, -938.33030278))
            ThreePointArc((61.080112923, -938.33030278), (50.980444052, -931.532562595), (47.080112923, -920))
        make_face()
        with Locations((51.580112923, -944.535688293)):
            Circle(BOSS_EXTRUDE5_OUTLINE_R, mode=Mode.SUBTRACT)
    # profile 6 of 8: a face of its own
    with BuildSketch(Plane(origin=(0, 0, -5), x_dir=(-1, 0, 0), z_dir=(0, 0, -1)).offset(BOSS_EXTRUDE5_START)):
        with BuildLine():
            Line((47.080112923, -838.43738), (47.080112923, -847.93738))
            ThreePointArc((47.080112923, -847.93738), (48.398132408, -851.119360515), (51.580112923, -852.43738))
            Line((51.580112923, -852.43738), (61.080112923, -852.43738))
            Line((61.080112923, -852.43738), (61.080112923, -838.43738))
            Line((61.080112923, -838.43738), (47.080112923, -838.43738))
        make_face()
        with Locations((51.580112923, -847.93738)):
            Circle(BOSS_EXTRUDE5_OUTLINE_R, mode=Mode.SUBTRACT)
    # profile 7 of 8: a face of its own
    with BuildSketch(Plane(origin=(0, 0, -5), x_dir=(-1, 0, 0), z_dir=(0, 0, -1)).offset(BOSS_EXTRUDE5_START)):
        with BuildLine():
            Line((-91.419887077, -852.43738), (-81.919887077, -852.43738))
            ThreePointArc((-81.919887077, -852.43738), (-78.737906561, -851.119360516), (-77.419887077, -847.93738))
            Line((-77.419887077, -847.93738), (-77.419887077, -838.43738))
            Line((-77.419887077, -838.43738), (-91.419887077, -838.43738))
            Line((-91.419887077, -838.43738), (-91.419887077, -852.43738))
        make_face()
        with Locations((-81.919887077, -847.93738)):
            Circle(BOSS_EXTRUDE5_OUTLINE_R, mode=Mode.SUBTRACT)
    # profile 8 of 8: a face of its own
    with BuildSketch(Plane(origin=(0, 0, -5), x_dir=(-1, 0, 0), z_dir=(0, 0, -1)).offset(BOSS_EXTRUDE5_START)):
        with BuildLine():
            Line((-91.419887077, -949.035688293), (-81.919887077, -949.035688293))
            ThreePointArc((-81.919887077, -949.035688293), (-78.737906562, -947.717668808), (-77.419887077, -944.535688293))
            Line((-77.419887077, -944.535688293), (-77.419887077, -920))
            ThreePointArc((-77.419887077, -920), (-81.320218206, -931.532562595), (-91.419887077, -938.33030278))
            Line((-91.419887077, -938.33030278), (-91.419887077, -949.035688293))
        make_face()
        with BuildLine():
            Line((-86.415652438, -944.340511931), (-86.414971961, -944.745954498))
            ThreePointArc((-86.414971961, -944.745954498), (-86.419880739, -944.543240882), (-86.415652438, -944.340511931))
        make_face(mode=Mode.SUBTRACT)
        with Locations((-81.919887077, -944.535688293)):
            Circle(BOSS_EXTRUDE5_OUTLINE_R, mode=Mode.SUBTRACT)
    extrude(amount=BOSS_EXTRUDE5_DEPTH)

    # Sketch13 → Cut-Extrude4 (cut, two sides: drawn at the far end of the back side and taken through both)
    with BuildSketch(Plane.XY.offset(-CUT_EXTRUDE4_DEPTH_BACK)):
        Polygon((94.023297062, -1000), (94.023297062, -990), (113.715152321, -990), (110.419887077, -1000), (180.991747424, -1022.37445391), (169.051741721, -1117.894499535), (178.766489059, -1320.824777271), (-54.387447063, -1291.680535255), (-189.224542066, -1144.69750743), (-91.869342688, -1000), (-66.080112923, -1000), (-63.520729079, -1000), (-63.520729079, -990), (82.322721203, -990), (82.322721203, -1000), align=None)
    extrude(amount=CUT_EXTRUDE4_DEPTH + CUT_EXTRUDE4_DEPTH_BACK, mode=Mode.SUBTRACT)

    # Sketch14 → Cut-Extrude5 (cut, through all)
    with BuildSketch(Plane.XY):
        with BuildLine():
            Line((-76.080112923, -1000), (-114.548207205, -1013.362990202))
            Line((-114.548207205, -1013.362990202), (-112.250375439, -756.771776282))
            Line((-112.250375439, -756.771776282), (134.000595533, -776.686318257))
            Line((134.000595533, -776.686318257), (134.000595533, -1013.362990202))
            Line((134.000595533, -1013.362990202), (106.419887077, -990))
            Line((106.419887077, -990), (106.419887077, -812.43738))
            ThreePointArc((106.419887077, -812.43738), (103.490954888, -805.366312188), (96.419887077, -802.43738))
            Line((96.419887077, -802.43738), (-66.080112923, -802.43738))
            ThreePointArc((-66.080112923, -802.43738), (-73.151180735, -805.366312188), (-76.080112923, -812.43738))
            Line((-76.080112923, -812.43738), (-76.080112923, -1000))
        make_face()
    extrude(amount=-CUT_EXTRUDE5_DEPTH, mode=Mode.SUBTRACT)


solid = part.part
